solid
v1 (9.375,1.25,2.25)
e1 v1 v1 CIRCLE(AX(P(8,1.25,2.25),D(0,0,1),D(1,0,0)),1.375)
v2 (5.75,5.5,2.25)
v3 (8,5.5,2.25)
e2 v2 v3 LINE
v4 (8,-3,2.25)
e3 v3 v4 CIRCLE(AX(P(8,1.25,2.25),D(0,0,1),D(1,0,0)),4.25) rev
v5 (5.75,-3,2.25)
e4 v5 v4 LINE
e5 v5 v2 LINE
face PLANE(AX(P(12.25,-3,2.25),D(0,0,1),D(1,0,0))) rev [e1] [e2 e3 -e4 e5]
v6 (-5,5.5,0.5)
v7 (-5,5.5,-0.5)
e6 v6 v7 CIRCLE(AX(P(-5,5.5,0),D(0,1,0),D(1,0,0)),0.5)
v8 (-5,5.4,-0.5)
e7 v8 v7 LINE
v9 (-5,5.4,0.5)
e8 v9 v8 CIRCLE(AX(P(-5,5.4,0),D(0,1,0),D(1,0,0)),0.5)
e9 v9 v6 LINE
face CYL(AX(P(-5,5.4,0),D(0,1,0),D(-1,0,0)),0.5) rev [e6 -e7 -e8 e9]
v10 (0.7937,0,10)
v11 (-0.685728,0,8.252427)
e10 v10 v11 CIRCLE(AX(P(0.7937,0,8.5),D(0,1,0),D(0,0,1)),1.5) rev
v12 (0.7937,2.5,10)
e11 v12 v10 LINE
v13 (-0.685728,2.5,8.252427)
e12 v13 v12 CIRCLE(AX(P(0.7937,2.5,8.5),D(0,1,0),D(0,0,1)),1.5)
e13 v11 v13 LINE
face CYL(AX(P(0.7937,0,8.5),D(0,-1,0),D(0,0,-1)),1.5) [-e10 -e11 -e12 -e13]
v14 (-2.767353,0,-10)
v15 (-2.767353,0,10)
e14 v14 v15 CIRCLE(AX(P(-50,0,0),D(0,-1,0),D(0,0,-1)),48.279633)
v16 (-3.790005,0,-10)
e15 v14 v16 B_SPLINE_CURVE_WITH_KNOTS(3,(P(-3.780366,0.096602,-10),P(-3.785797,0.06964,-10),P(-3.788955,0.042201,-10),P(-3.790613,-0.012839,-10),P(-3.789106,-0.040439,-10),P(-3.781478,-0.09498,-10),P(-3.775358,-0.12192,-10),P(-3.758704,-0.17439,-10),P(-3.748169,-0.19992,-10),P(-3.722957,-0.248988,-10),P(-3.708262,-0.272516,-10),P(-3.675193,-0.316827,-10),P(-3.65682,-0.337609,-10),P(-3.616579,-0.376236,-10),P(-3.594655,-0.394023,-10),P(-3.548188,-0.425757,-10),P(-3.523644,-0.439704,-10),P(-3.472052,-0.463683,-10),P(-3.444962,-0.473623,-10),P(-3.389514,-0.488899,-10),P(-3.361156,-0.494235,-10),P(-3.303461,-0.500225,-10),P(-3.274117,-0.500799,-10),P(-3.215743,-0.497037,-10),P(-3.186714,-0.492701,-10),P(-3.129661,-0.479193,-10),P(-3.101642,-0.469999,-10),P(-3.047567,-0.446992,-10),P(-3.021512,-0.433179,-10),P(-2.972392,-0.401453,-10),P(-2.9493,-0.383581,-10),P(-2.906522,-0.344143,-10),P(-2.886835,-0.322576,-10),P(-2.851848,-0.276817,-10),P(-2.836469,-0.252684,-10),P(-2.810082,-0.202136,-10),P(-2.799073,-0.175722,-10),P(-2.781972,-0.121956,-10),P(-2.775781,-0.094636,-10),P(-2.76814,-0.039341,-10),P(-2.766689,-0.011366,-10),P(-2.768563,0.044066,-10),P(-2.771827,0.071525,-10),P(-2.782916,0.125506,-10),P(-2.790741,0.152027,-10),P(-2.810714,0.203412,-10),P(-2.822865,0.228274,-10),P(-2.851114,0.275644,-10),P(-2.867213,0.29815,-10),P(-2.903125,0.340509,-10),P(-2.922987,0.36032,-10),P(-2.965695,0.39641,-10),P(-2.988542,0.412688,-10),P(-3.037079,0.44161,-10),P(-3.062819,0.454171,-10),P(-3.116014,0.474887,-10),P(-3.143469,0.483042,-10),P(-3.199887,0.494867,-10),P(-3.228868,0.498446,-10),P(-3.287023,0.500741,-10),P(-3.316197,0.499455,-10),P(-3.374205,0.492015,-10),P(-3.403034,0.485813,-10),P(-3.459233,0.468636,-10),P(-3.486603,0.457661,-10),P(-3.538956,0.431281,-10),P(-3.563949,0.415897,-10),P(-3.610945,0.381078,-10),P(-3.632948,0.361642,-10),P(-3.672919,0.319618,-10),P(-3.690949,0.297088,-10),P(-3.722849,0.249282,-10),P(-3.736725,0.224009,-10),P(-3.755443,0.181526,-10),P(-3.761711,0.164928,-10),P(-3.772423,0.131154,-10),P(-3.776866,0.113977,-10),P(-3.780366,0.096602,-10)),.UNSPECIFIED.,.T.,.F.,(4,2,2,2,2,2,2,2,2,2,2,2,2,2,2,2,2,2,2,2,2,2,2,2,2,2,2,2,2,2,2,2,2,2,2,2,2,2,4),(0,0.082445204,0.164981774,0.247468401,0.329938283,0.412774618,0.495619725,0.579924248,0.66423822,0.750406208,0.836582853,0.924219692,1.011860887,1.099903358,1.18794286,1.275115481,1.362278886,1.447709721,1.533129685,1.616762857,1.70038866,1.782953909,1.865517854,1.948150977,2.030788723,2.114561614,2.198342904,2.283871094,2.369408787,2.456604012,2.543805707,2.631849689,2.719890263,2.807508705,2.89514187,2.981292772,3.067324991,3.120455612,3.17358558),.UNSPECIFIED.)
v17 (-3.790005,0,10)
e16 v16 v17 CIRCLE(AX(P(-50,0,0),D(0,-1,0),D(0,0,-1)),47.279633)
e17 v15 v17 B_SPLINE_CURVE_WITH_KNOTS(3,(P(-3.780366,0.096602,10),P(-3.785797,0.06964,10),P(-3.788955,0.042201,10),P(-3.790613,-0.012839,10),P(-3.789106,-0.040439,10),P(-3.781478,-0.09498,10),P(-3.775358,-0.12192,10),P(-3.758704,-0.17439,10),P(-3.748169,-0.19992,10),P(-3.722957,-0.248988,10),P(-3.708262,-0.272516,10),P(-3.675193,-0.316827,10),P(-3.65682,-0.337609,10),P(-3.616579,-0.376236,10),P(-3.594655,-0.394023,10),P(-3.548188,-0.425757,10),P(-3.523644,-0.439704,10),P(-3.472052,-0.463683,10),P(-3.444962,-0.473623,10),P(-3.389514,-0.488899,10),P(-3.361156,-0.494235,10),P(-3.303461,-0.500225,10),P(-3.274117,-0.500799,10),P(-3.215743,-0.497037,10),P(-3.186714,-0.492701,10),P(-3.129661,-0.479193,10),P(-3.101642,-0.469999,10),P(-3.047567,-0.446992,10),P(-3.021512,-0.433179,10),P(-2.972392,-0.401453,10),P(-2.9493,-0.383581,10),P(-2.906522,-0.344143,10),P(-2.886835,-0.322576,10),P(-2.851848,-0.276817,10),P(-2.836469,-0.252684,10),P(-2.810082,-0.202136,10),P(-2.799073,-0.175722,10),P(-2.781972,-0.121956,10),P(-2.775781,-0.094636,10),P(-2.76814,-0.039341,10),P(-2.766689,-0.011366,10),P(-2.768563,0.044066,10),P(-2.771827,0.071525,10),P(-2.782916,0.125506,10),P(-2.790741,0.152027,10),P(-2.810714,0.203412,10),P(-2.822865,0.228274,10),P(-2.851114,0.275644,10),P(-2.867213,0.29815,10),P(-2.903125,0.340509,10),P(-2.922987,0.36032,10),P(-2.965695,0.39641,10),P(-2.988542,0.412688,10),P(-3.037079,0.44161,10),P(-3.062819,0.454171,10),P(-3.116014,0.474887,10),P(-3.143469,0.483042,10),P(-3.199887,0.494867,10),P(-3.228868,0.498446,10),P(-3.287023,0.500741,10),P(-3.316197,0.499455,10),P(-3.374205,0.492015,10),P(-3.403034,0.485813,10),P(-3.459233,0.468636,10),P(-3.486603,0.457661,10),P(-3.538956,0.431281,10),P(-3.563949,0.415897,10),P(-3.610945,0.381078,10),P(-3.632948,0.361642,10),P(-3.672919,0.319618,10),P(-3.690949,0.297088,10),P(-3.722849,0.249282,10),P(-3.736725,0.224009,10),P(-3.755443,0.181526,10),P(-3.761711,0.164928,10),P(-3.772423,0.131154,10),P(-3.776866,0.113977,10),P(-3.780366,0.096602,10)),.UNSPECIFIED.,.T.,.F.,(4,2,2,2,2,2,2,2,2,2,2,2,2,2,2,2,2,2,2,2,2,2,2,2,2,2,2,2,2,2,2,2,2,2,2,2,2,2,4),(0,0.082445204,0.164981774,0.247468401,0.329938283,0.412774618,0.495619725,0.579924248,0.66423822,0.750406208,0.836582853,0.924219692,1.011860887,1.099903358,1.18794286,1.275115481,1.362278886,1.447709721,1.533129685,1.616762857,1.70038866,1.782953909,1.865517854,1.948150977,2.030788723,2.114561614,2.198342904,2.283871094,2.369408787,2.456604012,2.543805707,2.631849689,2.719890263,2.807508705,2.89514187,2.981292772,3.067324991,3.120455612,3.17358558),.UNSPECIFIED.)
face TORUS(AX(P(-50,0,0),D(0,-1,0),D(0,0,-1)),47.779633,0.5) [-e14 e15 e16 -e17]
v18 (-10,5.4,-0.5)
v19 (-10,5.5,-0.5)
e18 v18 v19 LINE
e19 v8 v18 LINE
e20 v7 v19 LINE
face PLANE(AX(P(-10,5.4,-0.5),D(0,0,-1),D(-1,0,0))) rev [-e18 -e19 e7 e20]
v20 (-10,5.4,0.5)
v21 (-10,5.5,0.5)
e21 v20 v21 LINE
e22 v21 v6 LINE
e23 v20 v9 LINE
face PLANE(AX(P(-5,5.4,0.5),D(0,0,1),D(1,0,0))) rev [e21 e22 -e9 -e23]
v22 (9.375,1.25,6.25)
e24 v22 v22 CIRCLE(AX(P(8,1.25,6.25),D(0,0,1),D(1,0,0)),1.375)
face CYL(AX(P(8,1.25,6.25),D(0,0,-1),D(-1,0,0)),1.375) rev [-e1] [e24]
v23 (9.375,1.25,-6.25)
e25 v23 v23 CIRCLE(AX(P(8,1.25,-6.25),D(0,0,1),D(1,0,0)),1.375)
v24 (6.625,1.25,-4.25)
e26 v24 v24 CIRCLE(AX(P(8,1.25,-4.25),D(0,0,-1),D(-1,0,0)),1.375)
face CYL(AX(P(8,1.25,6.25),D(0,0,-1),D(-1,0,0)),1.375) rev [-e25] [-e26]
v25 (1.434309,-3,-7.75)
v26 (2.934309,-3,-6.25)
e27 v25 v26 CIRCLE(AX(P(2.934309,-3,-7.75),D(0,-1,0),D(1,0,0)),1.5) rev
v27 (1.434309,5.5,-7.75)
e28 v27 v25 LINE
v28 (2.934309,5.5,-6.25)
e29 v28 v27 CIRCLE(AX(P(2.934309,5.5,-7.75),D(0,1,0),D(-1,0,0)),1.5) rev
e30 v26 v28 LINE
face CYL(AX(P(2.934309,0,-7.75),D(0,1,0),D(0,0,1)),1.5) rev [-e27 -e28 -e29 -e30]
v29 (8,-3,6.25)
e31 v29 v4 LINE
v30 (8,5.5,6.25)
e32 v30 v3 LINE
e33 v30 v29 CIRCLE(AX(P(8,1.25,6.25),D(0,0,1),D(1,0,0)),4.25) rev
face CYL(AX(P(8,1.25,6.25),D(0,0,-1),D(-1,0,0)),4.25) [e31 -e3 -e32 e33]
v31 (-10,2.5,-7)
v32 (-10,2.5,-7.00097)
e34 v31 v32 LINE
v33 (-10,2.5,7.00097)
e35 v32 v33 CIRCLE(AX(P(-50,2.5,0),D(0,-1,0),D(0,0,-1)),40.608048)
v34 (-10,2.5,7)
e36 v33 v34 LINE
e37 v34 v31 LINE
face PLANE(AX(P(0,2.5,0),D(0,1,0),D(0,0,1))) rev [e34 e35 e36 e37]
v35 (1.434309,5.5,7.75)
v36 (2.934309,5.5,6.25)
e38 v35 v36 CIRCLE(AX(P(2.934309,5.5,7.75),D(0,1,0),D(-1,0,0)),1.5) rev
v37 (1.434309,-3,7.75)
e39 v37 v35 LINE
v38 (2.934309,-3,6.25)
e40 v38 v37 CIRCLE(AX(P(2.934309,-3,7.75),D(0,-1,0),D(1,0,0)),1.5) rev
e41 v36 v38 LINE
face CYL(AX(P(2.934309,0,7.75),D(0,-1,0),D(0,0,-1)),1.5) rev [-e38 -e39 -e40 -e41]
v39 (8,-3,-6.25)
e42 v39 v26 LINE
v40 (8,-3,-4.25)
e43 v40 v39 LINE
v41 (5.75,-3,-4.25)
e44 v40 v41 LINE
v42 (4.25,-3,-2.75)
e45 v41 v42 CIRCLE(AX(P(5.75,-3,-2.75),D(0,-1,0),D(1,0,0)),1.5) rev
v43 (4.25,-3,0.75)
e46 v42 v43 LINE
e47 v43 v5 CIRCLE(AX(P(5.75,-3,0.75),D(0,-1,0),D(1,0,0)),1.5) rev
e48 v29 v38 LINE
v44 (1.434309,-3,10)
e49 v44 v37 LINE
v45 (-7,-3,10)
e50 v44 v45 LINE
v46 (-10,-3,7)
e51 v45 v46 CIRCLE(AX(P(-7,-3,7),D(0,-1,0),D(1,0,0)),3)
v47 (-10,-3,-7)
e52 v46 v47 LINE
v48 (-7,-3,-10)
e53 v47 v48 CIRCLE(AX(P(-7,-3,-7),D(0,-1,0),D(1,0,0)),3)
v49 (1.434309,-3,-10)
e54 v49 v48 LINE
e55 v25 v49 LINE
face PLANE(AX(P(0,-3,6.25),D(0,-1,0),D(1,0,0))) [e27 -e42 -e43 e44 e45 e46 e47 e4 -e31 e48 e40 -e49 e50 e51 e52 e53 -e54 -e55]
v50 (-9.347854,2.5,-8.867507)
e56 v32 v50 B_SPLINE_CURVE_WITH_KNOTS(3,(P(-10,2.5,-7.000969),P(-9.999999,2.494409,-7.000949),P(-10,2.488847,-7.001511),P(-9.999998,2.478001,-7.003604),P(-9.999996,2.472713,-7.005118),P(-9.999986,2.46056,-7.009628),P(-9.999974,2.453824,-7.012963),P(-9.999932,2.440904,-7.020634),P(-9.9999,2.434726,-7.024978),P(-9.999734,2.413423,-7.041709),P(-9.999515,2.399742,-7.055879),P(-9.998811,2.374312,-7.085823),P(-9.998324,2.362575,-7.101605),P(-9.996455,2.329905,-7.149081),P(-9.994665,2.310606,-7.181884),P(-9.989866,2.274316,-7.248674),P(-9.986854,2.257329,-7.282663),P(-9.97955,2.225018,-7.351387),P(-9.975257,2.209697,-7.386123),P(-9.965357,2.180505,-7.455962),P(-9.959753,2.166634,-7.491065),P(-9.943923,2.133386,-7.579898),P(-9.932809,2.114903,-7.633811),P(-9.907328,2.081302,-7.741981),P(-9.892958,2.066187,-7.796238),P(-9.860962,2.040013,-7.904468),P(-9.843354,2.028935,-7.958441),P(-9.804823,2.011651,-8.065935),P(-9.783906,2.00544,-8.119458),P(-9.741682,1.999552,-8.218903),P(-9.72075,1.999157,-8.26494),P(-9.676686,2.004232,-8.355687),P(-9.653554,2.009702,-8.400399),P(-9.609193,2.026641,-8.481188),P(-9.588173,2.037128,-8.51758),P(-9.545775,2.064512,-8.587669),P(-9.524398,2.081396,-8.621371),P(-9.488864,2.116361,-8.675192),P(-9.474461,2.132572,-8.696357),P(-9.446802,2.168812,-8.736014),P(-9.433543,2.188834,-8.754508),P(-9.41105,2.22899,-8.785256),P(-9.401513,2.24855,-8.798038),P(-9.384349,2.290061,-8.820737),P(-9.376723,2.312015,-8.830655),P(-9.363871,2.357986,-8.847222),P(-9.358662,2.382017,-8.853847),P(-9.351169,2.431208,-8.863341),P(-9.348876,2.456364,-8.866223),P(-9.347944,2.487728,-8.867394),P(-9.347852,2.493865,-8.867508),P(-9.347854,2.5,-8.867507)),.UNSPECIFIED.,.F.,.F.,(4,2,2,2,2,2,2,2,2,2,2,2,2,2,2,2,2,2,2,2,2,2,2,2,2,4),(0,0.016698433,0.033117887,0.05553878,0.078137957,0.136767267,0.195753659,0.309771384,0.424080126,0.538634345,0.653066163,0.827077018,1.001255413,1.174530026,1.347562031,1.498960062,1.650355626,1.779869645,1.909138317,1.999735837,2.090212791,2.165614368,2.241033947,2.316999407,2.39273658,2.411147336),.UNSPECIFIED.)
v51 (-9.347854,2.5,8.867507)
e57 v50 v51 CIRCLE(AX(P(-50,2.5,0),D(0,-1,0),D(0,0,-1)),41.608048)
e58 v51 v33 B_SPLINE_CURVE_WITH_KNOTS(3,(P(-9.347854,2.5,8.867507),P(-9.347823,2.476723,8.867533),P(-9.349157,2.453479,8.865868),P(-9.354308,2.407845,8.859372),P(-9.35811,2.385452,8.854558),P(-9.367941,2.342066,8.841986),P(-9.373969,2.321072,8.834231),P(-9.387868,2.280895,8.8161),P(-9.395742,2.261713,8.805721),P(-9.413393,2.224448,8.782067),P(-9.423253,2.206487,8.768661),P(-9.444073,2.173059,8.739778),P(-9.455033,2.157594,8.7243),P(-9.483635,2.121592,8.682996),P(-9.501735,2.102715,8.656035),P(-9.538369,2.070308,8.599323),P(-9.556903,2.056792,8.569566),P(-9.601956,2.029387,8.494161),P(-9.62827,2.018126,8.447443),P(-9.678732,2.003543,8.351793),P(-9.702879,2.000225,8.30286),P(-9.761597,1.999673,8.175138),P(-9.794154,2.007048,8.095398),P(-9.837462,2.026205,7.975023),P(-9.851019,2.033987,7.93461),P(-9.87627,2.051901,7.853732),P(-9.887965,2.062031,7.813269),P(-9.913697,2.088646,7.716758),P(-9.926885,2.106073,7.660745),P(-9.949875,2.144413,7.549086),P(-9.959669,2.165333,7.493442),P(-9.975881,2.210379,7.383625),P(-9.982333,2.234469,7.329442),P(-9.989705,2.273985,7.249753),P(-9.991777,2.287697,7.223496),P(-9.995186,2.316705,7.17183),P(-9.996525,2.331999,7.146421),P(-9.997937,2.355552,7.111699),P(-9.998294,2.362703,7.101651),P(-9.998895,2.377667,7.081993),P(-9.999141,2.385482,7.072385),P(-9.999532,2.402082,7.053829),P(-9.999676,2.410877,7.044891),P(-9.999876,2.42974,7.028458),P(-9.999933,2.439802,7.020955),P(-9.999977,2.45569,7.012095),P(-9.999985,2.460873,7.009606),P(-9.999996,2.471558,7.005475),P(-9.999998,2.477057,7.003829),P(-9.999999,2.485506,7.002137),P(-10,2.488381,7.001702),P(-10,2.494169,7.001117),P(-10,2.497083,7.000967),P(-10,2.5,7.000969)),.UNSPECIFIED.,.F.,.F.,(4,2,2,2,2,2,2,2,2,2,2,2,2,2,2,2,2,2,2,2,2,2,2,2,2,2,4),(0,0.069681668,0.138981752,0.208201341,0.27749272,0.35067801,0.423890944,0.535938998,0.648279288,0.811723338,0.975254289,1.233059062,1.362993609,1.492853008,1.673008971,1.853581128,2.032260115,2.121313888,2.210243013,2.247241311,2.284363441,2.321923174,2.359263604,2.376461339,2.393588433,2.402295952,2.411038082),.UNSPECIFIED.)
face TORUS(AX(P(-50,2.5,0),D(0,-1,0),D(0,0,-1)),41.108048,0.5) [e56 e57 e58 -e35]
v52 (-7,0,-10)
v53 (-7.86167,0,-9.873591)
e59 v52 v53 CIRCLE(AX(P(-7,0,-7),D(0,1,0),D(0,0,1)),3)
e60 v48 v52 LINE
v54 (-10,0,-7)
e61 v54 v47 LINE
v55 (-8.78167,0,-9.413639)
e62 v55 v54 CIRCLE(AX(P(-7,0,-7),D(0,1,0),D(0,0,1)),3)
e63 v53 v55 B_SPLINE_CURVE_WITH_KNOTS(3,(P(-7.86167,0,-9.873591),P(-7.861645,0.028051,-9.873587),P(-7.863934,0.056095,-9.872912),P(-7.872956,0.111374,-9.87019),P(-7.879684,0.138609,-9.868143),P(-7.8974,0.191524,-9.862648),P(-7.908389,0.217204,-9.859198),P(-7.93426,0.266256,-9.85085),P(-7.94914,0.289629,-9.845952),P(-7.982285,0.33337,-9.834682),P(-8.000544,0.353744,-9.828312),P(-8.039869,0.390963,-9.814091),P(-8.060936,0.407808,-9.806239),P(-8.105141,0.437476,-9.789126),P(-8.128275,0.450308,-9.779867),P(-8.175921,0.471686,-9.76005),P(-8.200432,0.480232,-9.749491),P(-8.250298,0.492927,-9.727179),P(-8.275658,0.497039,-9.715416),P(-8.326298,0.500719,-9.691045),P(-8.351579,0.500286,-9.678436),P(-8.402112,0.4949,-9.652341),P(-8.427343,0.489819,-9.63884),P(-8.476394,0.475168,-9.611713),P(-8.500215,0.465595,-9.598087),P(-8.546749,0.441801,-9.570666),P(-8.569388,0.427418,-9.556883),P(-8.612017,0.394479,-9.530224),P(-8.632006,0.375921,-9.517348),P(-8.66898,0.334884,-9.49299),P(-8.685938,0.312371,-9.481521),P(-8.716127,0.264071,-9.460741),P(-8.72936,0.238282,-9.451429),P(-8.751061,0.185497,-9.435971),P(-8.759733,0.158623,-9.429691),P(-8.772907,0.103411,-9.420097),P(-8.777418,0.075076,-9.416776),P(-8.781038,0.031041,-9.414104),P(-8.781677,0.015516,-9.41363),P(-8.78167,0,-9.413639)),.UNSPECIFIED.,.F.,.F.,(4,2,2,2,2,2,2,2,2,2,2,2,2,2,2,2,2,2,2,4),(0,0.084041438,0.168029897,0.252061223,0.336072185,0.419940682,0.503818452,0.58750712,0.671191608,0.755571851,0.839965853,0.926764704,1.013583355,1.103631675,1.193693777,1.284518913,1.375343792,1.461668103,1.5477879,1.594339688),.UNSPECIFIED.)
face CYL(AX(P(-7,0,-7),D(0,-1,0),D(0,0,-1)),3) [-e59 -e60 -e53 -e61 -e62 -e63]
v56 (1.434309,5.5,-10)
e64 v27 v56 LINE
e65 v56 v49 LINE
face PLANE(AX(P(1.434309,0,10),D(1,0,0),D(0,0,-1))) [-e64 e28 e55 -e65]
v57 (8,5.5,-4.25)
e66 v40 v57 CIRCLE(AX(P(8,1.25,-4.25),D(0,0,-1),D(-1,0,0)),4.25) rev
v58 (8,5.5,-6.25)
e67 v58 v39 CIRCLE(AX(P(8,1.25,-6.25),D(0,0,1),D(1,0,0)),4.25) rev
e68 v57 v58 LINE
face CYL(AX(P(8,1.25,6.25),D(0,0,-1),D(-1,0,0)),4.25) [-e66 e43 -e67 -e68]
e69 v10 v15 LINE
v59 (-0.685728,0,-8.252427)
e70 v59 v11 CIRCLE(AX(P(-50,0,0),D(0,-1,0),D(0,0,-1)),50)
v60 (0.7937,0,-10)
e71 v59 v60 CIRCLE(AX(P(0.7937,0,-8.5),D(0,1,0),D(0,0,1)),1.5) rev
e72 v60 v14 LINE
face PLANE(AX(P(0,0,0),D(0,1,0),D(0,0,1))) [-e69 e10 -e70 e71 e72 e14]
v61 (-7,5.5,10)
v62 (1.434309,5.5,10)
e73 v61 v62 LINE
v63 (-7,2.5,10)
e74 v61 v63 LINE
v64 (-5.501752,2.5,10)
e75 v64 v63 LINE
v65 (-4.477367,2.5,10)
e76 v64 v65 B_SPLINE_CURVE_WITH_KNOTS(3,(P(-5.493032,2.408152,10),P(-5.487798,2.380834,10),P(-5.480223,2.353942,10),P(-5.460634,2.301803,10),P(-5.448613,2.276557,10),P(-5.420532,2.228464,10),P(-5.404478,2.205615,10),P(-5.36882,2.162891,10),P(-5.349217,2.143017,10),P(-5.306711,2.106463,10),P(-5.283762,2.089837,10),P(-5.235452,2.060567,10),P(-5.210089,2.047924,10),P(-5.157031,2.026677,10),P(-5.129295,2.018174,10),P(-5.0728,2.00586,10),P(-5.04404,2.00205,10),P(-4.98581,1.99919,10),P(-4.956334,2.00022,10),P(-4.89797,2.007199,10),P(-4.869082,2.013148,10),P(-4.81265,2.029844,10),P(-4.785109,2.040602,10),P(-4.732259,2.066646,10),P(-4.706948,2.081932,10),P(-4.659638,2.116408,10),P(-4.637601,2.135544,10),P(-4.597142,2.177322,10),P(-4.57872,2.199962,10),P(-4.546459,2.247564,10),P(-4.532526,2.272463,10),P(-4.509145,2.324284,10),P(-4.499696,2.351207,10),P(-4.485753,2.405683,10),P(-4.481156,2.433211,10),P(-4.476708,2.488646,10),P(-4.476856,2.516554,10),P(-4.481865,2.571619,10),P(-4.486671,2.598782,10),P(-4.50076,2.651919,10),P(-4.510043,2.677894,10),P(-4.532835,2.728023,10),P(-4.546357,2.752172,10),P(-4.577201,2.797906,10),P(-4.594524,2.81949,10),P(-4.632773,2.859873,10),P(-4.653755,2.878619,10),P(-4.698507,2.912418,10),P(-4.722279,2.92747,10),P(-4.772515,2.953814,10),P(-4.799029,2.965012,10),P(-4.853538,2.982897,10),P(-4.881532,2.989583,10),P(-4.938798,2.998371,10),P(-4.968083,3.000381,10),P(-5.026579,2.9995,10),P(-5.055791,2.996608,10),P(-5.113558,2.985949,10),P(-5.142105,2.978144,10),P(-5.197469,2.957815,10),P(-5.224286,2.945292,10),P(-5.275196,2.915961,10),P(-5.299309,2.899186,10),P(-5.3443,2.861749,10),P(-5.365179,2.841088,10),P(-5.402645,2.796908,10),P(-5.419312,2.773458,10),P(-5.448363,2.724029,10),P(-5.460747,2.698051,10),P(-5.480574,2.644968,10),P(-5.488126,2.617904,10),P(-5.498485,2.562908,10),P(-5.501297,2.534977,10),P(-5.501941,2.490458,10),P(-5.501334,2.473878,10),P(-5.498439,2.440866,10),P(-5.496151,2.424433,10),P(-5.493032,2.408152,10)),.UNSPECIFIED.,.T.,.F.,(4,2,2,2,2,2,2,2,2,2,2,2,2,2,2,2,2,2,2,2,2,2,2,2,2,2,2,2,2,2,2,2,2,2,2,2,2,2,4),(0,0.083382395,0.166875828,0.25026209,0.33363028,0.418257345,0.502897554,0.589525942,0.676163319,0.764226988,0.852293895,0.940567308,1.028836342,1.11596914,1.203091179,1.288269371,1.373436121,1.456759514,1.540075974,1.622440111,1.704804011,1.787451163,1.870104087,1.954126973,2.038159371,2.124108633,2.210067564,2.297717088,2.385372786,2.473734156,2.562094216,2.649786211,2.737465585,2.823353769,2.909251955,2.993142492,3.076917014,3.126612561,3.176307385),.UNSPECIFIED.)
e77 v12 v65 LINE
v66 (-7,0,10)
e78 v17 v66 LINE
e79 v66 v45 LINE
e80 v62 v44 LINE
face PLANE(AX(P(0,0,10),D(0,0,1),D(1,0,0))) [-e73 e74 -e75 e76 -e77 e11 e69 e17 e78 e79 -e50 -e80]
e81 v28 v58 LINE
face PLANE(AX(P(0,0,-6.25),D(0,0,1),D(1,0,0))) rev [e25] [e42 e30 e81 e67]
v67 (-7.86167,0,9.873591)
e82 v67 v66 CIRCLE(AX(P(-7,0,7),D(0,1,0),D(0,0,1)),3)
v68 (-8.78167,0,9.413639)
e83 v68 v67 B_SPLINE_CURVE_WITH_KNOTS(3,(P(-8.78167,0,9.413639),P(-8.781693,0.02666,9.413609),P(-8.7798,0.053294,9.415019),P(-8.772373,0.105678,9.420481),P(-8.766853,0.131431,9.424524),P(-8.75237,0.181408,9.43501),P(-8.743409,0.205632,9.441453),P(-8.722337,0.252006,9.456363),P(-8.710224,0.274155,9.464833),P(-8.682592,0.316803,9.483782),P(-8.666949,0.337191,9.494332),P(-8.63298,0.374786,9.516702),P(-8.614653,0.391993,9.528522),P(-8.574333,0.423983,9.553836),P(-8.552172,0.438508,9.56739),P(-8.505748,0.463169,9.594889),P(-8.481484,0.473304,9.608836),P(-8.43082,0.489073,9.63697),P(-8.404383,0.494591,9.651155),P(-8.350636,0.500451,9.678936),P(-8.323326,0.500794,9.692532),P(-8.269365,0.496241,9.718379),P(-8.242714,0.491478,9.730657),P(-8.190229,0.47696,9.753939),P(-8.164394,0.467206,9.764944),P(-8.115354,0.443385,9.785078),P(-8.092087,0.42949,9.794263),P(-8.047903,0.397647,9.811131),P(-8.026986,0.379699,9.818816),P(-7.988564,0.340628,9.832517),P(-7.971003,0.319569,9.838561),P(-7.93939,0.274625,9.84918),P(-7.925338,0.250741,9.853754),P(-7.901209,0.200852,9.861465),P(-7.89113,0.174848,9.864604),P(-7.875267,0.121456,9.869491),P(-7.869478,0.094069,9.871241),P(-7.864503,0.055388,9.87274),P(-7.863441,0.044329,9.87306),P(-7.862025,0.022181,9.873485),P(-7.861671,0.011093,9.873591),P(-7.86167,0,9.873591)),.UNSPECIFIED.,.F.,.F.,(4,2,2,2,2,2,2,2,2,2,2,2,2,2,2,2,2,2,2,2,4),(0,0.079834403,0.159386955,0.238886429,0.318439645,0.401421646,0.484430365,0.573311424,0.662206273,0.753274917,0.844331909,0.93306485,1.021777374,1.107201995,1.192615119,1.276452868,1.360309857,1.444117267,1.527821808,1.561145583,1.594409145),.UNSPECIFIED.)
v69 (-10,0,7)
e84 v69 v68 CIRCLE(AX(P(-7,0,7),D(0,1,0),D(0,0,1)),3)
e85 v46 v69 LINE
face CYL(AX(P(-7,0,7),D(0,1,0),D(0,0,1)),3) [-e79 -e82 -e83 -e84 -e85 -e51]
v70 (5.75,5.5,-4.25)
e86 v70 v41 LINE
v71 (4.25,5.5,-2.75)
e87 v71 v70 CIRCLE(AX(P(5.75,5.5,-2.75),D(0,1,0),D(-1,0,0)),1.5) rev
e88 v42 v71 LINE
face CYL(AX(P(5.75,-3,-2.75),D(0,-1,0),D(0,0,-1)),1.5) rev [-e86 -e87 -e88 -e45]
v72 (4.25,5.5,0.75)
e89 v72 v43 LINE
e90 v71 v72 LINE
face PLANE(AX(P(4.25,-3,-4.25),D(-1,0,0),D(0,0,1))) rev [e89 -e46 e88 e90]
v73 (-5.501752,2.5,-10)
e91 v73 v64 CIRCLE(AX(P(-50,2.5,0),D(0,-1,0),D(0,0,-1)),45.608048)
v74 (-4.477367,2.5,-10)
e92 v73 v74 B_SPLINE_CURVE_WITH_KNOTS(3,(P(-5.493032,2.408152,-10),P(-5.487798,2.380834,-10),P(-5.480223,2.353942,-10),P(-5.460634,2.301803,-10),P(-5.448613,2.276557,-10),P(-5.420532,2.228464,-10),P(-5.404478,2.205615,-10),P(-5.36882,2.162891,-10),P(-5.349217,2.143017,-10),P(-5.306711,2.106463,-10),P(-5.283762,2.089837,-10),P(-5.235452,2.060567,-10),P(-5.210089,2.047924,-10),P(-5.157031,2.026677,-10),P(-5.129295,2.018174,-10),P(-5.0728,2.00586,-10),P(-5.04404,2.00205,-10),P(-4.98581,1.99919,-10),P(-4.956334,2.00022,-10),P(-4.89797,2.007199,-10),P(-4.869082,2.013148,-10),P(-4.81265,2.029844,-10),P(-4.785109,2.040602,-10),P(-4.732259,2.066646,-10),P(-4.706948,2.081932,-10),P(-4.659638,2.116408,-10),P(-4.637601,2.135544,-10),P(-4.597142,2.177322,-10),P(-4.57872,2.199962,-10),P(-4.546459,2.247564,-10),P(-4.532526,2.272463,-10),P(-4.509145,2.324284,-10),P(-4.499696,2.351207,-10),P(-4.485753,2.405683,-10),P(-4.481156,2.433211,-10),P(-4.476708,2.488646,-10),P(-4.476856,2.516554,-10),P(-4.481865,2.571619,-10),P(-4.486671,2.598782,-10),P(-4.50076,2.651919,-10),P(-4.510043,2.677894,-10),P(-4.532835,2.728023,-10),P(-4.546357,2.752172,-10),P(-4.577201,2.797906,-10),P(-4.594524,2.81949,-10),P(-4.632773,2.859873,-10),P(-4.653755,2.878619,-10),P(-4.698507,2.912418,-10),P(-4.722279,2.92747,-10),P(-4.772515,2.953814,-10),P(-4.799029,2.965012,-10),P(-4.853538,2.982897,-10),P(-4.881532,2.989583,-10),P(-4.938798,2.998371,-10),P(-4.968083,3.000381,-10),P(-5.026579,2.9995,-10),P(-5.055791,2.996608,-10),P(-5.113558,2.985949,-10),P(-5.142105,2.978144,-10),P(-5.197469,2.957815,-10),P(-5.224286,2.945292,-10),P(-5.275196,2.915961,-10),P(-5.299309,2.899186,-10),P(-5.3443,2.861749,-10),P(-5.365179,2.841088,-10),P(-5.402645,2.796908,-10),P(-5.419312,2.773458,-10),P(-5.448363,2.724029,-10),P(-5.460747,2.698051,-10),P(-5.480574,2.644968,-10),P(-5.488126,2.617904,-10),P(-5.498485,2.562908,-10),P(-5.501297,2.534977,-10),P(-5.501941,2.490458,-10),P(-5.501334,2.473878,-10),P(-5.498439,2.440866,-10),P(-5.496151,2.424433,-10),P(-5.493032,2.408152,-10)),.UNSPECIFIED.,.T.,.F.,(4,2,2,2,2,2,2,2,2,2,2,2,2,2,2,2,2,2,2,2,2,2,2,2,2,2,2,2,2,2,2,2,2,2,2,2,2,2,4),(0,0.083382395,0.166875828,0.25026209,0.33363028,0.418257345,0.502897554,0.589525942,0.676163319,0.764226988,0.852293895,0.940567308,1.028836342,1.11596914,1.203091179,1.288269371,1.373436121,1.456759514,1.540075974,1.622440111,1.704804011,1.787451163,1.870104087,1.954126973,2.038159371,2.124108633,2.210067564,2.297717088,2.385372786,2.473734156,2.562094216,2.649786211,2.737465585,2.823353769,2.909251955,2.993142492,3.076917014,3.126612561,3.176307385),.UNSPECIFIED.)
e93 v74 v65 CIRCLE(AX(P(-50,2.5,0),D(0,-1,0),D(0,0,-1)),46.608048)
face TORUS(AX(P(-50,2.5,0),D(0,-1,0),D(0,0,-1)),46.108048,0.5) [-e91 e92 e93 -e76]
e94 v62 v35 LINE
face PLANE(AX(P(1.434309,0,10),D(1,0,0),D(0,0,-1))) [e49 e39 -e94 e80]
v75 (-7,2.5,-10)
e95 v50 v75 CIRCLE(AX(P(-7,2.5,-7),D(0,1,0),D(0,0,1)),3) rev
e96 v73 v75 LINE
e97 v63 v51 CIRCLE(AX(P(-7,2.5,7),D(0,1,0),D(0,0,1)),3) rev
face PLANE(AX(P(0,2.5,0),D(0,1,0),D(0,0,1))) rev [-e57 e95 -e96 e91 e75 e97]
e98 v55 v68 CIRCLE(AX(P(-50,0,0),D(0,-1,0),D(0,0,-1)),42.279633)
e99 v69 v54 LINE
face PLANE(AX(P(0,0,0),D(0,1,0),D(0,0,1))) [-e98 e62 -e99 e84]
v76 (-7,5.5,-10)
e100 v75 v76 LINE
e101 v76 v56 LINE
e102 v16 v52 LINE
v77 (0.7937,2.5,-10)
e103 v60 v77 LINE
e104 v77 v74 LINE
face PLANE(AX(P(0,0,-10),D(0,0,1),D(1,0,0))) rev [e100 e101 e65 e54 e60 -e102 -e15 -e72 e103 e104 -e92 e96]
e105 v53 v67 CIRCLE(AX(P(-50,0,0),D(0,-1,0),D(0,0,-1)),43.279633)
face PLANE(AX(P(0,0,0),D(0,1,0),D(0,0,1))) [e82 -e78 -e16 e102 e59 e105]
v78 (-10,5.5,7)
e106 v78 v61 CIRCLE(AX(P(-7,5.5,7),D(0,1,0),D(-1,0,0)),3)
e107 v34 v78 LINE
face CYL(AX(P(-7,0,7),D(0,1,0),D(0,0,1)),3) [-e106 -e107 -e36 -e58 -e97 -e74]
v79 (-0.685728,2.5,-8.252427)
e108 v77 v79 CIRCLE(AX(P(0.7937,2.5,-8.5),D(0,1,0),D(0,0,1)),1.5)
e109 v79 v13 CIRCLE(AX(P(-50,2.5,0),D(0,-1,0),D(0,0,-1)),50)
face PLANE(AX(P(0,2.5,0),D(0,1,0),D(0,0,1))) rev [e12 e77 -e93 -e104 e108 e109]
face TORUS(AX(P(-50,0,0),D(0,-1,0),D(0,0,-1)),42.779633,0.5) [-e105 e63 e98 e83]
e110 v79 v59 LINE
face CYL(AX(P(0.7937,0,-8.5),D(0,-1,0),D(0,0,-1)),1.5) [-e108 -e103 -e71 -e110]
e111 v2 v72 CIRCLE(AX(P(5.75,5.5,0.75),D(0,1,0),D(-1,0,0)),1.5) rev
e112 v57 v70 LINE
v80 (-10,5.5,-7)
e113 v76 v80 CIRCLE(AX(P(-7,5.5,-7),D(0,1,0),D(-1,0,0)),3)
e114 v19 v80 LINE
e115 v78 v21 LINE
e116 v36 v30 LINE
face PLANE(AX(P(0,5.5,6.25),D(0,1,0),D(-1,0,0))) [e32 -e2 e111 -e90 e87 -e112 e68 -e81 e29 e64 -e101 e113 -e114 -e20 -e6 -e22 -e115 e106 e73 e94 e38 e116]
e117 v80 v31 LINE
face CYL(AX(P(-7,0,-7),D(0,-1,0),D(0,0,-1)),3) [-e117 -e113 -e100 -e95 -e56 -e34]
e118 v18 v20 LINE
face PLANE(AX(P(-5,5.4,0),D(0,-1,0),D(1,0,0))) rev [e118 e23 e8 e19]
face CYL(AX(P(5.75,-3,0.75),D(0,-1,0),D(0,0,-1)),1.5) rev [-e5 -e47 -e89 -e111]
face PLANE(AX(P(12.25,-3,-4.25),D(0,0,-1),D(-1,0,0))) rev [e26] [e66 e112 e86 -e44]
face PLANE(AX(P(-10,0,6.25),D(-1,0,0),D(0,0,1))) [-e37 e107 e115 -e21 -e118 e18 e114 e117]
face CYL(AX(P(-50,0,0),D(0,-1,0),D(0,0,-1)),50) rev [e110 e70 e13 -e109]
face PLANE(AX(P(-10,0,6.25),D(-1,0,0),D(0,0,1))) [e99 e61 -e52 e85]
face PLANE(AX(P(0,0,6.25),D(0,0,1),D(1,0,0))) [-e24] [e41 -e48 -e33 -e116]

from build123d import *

# Parameters (mm, degrees)
SKETCH1_R               = 1.375
BOSS_EXTRUDE1_DEPTH     = 6.25
CUT_EXTRUDE1_DEPTH      = 15.811313244
CUT_EXTRUDE1_DEPTH_BACK = 15.811313244
SKETCH2_W               = 8
SKETCH2_H               = 6.5
BOSS_EXTRUDE2_START     = -10
BOSS_EXTRUDE2_OUTLINE_W = 11.434309127
BOSS_EXTRUDE2_OUTLINE_H = 8.5
BOSS_EXTRUDE2_DEPTH     = 20
FILLET4_R               = 1.5
FILLET5_R               = 1.5
FILLET6_R               = 3
CUT_EXTRUDE2_DEPTH      = 0.1


# Read off the part's stored shape, not the designer's step: Boss-Extrude2
with BuildPart() as part:
    # Sketch1 → Boss-Extrude1 (new, symmetric)
    with BuildSketch(Plane.XY):
        with BuildLine():
            Line((-10, 5.5), (-10, -3))
            Line((-10, -3), (8, -3))
            ThreePointArc((8, -3), (12.25, 1.25), (8, 5.5))
            Line((8, 5.5), (-10, 5.5))
        make_face()
        with Locations((8, 1.25)):
            Circle(SKETCH1_R, mode=Mode.SUBTRACT)
    extrude(amount=BOSS_EXTRUDE1_DEPTH, both=True)

    # Sketch2 → Cut-Extrude1 (cut, two sides: drawn at the far end of the back side and taken through both)
    with BuildSketch(Plane(origin=(0, 0, 0), x_dir=(1, 0, 0), z_dir=(0, 1, 0)).offset(-CUT_EXTRUDE1_DEPTH_BACK)):
        with Locations((8.25, 1)):
            Rectangle(SKETCH2_W, SKETCH2_H)
    extrude(amount=CUT_EXTRUDE1_DEPTH + CUT_EXTRUDE1_DEPTH_BACK, mode=Mode.SUBTRACT)

    # Boss-Extrude2 outline → Boss-Extrude2 (add)
    with BuildSketch(Plane.XY.offset(BOSS_EXTRUDE2_START)):
        with Locations((-4.282845436, 1.25)):
            Rectangle(BOSS_EXTRUDE2_OUTLINE_W, BOSS_EXTRUDE2_OUTLINE_H)
    extrude(amount=BOSS_EXTRUDE2_DEPTH)

    # Sketch1<5> → Cut-Revolve2 (revolve, cut)
    with BuildSketch(Plane.XY):
        with BuildLine():
            Line((-9.391951793, 2.5), (-10, 2.5))
            Line((-10, 2.5), (-10, 0))
            Line((-10, 0), (-7.720367157, 0))
            ThreePointArc((-7.720367157, 0), (-7.220367157, 0.5), (-6.720367157, 0))
            Line((-6.720367157, 0), (-2.720367157, 0))
            ThreePointArc((-2.720367157, 0), (-2.220367157, 0.5), (-1.720367157, 0))
            Line((-1.720367157, 0), (0, 0))
            Line((0, 0), (0, 2.5))
            Line((0, 2.5), (-3.391951793, 2.5))
            ThreePointArc((-3.391951793, 2.5), (-3.891951793, 2), (-4.391951793, 2.5))
            Line((-4.391951793, 2.5), (-8.391951793, 2.5))
            ThreePointArc((-8.391951793, 2.5), (-8.891951793, 2), (-9.391951793, 2.5))
        make_face()
    revolve(axis=Axis((-50, 0, 0), (0, 1, 0)), mode=Mode.SUBTRACT)

    # Fillet4
    fillet4_edges = [part.edges().sort_by_distance(p)[0] for p in [
        (4.25, 1.25, 2.25),
        (4.25, 1.25, -4.25),
    ]]
    fillet(fillet4_edges, radius=FILLET4_R)

    # Fillet5
    fillet5_edges = [part.edges().sort_by_distance(p)[0] for p in [
        (1.434309127, 1.25, -6.25),
        (1.434309127, 1.25, 6.25),
        (-1.010205144, 1.25, 10),
        (-1.010205144, 1.25, -10),
    ]]
    fillet(fillet5_edges, radius=FILLET5_R)

    # Fillet6
    fillet6_edges = [part.edges().sort_by_distance(p)[0] for p in [
        (-10, -1.5, -10),
        (-10, 3.757683564, -10),
        (-10, -1.5, 10),
        (-10, 3.757683564, 10),
    ]]
    fillet(fillet6_edges, radius=FILLET6_R)

    # Sketch5 → Cut-Extrude2 (cut)
    with BuildSketch(Plane(origin=(0, 5.5, 0), x_dir=(1, 0, 0), z_dir=(0, 1, 0))):
        with BuildLine():
            Line((-10, 0.5), (-5, 0.5))
            ThreePointArc((-5, 0.5), (-4.5, 0), (-5, -0.5))
            Line((-5, -0.5), (-10, -0.5))
            Line((-10, -0.5), (-10, 0.5))
        make_face()
    extrude(amount=-CUT_EXTRUDE2_DEPTH, mode=Mode.SUBTRACT)


solid = part.part
